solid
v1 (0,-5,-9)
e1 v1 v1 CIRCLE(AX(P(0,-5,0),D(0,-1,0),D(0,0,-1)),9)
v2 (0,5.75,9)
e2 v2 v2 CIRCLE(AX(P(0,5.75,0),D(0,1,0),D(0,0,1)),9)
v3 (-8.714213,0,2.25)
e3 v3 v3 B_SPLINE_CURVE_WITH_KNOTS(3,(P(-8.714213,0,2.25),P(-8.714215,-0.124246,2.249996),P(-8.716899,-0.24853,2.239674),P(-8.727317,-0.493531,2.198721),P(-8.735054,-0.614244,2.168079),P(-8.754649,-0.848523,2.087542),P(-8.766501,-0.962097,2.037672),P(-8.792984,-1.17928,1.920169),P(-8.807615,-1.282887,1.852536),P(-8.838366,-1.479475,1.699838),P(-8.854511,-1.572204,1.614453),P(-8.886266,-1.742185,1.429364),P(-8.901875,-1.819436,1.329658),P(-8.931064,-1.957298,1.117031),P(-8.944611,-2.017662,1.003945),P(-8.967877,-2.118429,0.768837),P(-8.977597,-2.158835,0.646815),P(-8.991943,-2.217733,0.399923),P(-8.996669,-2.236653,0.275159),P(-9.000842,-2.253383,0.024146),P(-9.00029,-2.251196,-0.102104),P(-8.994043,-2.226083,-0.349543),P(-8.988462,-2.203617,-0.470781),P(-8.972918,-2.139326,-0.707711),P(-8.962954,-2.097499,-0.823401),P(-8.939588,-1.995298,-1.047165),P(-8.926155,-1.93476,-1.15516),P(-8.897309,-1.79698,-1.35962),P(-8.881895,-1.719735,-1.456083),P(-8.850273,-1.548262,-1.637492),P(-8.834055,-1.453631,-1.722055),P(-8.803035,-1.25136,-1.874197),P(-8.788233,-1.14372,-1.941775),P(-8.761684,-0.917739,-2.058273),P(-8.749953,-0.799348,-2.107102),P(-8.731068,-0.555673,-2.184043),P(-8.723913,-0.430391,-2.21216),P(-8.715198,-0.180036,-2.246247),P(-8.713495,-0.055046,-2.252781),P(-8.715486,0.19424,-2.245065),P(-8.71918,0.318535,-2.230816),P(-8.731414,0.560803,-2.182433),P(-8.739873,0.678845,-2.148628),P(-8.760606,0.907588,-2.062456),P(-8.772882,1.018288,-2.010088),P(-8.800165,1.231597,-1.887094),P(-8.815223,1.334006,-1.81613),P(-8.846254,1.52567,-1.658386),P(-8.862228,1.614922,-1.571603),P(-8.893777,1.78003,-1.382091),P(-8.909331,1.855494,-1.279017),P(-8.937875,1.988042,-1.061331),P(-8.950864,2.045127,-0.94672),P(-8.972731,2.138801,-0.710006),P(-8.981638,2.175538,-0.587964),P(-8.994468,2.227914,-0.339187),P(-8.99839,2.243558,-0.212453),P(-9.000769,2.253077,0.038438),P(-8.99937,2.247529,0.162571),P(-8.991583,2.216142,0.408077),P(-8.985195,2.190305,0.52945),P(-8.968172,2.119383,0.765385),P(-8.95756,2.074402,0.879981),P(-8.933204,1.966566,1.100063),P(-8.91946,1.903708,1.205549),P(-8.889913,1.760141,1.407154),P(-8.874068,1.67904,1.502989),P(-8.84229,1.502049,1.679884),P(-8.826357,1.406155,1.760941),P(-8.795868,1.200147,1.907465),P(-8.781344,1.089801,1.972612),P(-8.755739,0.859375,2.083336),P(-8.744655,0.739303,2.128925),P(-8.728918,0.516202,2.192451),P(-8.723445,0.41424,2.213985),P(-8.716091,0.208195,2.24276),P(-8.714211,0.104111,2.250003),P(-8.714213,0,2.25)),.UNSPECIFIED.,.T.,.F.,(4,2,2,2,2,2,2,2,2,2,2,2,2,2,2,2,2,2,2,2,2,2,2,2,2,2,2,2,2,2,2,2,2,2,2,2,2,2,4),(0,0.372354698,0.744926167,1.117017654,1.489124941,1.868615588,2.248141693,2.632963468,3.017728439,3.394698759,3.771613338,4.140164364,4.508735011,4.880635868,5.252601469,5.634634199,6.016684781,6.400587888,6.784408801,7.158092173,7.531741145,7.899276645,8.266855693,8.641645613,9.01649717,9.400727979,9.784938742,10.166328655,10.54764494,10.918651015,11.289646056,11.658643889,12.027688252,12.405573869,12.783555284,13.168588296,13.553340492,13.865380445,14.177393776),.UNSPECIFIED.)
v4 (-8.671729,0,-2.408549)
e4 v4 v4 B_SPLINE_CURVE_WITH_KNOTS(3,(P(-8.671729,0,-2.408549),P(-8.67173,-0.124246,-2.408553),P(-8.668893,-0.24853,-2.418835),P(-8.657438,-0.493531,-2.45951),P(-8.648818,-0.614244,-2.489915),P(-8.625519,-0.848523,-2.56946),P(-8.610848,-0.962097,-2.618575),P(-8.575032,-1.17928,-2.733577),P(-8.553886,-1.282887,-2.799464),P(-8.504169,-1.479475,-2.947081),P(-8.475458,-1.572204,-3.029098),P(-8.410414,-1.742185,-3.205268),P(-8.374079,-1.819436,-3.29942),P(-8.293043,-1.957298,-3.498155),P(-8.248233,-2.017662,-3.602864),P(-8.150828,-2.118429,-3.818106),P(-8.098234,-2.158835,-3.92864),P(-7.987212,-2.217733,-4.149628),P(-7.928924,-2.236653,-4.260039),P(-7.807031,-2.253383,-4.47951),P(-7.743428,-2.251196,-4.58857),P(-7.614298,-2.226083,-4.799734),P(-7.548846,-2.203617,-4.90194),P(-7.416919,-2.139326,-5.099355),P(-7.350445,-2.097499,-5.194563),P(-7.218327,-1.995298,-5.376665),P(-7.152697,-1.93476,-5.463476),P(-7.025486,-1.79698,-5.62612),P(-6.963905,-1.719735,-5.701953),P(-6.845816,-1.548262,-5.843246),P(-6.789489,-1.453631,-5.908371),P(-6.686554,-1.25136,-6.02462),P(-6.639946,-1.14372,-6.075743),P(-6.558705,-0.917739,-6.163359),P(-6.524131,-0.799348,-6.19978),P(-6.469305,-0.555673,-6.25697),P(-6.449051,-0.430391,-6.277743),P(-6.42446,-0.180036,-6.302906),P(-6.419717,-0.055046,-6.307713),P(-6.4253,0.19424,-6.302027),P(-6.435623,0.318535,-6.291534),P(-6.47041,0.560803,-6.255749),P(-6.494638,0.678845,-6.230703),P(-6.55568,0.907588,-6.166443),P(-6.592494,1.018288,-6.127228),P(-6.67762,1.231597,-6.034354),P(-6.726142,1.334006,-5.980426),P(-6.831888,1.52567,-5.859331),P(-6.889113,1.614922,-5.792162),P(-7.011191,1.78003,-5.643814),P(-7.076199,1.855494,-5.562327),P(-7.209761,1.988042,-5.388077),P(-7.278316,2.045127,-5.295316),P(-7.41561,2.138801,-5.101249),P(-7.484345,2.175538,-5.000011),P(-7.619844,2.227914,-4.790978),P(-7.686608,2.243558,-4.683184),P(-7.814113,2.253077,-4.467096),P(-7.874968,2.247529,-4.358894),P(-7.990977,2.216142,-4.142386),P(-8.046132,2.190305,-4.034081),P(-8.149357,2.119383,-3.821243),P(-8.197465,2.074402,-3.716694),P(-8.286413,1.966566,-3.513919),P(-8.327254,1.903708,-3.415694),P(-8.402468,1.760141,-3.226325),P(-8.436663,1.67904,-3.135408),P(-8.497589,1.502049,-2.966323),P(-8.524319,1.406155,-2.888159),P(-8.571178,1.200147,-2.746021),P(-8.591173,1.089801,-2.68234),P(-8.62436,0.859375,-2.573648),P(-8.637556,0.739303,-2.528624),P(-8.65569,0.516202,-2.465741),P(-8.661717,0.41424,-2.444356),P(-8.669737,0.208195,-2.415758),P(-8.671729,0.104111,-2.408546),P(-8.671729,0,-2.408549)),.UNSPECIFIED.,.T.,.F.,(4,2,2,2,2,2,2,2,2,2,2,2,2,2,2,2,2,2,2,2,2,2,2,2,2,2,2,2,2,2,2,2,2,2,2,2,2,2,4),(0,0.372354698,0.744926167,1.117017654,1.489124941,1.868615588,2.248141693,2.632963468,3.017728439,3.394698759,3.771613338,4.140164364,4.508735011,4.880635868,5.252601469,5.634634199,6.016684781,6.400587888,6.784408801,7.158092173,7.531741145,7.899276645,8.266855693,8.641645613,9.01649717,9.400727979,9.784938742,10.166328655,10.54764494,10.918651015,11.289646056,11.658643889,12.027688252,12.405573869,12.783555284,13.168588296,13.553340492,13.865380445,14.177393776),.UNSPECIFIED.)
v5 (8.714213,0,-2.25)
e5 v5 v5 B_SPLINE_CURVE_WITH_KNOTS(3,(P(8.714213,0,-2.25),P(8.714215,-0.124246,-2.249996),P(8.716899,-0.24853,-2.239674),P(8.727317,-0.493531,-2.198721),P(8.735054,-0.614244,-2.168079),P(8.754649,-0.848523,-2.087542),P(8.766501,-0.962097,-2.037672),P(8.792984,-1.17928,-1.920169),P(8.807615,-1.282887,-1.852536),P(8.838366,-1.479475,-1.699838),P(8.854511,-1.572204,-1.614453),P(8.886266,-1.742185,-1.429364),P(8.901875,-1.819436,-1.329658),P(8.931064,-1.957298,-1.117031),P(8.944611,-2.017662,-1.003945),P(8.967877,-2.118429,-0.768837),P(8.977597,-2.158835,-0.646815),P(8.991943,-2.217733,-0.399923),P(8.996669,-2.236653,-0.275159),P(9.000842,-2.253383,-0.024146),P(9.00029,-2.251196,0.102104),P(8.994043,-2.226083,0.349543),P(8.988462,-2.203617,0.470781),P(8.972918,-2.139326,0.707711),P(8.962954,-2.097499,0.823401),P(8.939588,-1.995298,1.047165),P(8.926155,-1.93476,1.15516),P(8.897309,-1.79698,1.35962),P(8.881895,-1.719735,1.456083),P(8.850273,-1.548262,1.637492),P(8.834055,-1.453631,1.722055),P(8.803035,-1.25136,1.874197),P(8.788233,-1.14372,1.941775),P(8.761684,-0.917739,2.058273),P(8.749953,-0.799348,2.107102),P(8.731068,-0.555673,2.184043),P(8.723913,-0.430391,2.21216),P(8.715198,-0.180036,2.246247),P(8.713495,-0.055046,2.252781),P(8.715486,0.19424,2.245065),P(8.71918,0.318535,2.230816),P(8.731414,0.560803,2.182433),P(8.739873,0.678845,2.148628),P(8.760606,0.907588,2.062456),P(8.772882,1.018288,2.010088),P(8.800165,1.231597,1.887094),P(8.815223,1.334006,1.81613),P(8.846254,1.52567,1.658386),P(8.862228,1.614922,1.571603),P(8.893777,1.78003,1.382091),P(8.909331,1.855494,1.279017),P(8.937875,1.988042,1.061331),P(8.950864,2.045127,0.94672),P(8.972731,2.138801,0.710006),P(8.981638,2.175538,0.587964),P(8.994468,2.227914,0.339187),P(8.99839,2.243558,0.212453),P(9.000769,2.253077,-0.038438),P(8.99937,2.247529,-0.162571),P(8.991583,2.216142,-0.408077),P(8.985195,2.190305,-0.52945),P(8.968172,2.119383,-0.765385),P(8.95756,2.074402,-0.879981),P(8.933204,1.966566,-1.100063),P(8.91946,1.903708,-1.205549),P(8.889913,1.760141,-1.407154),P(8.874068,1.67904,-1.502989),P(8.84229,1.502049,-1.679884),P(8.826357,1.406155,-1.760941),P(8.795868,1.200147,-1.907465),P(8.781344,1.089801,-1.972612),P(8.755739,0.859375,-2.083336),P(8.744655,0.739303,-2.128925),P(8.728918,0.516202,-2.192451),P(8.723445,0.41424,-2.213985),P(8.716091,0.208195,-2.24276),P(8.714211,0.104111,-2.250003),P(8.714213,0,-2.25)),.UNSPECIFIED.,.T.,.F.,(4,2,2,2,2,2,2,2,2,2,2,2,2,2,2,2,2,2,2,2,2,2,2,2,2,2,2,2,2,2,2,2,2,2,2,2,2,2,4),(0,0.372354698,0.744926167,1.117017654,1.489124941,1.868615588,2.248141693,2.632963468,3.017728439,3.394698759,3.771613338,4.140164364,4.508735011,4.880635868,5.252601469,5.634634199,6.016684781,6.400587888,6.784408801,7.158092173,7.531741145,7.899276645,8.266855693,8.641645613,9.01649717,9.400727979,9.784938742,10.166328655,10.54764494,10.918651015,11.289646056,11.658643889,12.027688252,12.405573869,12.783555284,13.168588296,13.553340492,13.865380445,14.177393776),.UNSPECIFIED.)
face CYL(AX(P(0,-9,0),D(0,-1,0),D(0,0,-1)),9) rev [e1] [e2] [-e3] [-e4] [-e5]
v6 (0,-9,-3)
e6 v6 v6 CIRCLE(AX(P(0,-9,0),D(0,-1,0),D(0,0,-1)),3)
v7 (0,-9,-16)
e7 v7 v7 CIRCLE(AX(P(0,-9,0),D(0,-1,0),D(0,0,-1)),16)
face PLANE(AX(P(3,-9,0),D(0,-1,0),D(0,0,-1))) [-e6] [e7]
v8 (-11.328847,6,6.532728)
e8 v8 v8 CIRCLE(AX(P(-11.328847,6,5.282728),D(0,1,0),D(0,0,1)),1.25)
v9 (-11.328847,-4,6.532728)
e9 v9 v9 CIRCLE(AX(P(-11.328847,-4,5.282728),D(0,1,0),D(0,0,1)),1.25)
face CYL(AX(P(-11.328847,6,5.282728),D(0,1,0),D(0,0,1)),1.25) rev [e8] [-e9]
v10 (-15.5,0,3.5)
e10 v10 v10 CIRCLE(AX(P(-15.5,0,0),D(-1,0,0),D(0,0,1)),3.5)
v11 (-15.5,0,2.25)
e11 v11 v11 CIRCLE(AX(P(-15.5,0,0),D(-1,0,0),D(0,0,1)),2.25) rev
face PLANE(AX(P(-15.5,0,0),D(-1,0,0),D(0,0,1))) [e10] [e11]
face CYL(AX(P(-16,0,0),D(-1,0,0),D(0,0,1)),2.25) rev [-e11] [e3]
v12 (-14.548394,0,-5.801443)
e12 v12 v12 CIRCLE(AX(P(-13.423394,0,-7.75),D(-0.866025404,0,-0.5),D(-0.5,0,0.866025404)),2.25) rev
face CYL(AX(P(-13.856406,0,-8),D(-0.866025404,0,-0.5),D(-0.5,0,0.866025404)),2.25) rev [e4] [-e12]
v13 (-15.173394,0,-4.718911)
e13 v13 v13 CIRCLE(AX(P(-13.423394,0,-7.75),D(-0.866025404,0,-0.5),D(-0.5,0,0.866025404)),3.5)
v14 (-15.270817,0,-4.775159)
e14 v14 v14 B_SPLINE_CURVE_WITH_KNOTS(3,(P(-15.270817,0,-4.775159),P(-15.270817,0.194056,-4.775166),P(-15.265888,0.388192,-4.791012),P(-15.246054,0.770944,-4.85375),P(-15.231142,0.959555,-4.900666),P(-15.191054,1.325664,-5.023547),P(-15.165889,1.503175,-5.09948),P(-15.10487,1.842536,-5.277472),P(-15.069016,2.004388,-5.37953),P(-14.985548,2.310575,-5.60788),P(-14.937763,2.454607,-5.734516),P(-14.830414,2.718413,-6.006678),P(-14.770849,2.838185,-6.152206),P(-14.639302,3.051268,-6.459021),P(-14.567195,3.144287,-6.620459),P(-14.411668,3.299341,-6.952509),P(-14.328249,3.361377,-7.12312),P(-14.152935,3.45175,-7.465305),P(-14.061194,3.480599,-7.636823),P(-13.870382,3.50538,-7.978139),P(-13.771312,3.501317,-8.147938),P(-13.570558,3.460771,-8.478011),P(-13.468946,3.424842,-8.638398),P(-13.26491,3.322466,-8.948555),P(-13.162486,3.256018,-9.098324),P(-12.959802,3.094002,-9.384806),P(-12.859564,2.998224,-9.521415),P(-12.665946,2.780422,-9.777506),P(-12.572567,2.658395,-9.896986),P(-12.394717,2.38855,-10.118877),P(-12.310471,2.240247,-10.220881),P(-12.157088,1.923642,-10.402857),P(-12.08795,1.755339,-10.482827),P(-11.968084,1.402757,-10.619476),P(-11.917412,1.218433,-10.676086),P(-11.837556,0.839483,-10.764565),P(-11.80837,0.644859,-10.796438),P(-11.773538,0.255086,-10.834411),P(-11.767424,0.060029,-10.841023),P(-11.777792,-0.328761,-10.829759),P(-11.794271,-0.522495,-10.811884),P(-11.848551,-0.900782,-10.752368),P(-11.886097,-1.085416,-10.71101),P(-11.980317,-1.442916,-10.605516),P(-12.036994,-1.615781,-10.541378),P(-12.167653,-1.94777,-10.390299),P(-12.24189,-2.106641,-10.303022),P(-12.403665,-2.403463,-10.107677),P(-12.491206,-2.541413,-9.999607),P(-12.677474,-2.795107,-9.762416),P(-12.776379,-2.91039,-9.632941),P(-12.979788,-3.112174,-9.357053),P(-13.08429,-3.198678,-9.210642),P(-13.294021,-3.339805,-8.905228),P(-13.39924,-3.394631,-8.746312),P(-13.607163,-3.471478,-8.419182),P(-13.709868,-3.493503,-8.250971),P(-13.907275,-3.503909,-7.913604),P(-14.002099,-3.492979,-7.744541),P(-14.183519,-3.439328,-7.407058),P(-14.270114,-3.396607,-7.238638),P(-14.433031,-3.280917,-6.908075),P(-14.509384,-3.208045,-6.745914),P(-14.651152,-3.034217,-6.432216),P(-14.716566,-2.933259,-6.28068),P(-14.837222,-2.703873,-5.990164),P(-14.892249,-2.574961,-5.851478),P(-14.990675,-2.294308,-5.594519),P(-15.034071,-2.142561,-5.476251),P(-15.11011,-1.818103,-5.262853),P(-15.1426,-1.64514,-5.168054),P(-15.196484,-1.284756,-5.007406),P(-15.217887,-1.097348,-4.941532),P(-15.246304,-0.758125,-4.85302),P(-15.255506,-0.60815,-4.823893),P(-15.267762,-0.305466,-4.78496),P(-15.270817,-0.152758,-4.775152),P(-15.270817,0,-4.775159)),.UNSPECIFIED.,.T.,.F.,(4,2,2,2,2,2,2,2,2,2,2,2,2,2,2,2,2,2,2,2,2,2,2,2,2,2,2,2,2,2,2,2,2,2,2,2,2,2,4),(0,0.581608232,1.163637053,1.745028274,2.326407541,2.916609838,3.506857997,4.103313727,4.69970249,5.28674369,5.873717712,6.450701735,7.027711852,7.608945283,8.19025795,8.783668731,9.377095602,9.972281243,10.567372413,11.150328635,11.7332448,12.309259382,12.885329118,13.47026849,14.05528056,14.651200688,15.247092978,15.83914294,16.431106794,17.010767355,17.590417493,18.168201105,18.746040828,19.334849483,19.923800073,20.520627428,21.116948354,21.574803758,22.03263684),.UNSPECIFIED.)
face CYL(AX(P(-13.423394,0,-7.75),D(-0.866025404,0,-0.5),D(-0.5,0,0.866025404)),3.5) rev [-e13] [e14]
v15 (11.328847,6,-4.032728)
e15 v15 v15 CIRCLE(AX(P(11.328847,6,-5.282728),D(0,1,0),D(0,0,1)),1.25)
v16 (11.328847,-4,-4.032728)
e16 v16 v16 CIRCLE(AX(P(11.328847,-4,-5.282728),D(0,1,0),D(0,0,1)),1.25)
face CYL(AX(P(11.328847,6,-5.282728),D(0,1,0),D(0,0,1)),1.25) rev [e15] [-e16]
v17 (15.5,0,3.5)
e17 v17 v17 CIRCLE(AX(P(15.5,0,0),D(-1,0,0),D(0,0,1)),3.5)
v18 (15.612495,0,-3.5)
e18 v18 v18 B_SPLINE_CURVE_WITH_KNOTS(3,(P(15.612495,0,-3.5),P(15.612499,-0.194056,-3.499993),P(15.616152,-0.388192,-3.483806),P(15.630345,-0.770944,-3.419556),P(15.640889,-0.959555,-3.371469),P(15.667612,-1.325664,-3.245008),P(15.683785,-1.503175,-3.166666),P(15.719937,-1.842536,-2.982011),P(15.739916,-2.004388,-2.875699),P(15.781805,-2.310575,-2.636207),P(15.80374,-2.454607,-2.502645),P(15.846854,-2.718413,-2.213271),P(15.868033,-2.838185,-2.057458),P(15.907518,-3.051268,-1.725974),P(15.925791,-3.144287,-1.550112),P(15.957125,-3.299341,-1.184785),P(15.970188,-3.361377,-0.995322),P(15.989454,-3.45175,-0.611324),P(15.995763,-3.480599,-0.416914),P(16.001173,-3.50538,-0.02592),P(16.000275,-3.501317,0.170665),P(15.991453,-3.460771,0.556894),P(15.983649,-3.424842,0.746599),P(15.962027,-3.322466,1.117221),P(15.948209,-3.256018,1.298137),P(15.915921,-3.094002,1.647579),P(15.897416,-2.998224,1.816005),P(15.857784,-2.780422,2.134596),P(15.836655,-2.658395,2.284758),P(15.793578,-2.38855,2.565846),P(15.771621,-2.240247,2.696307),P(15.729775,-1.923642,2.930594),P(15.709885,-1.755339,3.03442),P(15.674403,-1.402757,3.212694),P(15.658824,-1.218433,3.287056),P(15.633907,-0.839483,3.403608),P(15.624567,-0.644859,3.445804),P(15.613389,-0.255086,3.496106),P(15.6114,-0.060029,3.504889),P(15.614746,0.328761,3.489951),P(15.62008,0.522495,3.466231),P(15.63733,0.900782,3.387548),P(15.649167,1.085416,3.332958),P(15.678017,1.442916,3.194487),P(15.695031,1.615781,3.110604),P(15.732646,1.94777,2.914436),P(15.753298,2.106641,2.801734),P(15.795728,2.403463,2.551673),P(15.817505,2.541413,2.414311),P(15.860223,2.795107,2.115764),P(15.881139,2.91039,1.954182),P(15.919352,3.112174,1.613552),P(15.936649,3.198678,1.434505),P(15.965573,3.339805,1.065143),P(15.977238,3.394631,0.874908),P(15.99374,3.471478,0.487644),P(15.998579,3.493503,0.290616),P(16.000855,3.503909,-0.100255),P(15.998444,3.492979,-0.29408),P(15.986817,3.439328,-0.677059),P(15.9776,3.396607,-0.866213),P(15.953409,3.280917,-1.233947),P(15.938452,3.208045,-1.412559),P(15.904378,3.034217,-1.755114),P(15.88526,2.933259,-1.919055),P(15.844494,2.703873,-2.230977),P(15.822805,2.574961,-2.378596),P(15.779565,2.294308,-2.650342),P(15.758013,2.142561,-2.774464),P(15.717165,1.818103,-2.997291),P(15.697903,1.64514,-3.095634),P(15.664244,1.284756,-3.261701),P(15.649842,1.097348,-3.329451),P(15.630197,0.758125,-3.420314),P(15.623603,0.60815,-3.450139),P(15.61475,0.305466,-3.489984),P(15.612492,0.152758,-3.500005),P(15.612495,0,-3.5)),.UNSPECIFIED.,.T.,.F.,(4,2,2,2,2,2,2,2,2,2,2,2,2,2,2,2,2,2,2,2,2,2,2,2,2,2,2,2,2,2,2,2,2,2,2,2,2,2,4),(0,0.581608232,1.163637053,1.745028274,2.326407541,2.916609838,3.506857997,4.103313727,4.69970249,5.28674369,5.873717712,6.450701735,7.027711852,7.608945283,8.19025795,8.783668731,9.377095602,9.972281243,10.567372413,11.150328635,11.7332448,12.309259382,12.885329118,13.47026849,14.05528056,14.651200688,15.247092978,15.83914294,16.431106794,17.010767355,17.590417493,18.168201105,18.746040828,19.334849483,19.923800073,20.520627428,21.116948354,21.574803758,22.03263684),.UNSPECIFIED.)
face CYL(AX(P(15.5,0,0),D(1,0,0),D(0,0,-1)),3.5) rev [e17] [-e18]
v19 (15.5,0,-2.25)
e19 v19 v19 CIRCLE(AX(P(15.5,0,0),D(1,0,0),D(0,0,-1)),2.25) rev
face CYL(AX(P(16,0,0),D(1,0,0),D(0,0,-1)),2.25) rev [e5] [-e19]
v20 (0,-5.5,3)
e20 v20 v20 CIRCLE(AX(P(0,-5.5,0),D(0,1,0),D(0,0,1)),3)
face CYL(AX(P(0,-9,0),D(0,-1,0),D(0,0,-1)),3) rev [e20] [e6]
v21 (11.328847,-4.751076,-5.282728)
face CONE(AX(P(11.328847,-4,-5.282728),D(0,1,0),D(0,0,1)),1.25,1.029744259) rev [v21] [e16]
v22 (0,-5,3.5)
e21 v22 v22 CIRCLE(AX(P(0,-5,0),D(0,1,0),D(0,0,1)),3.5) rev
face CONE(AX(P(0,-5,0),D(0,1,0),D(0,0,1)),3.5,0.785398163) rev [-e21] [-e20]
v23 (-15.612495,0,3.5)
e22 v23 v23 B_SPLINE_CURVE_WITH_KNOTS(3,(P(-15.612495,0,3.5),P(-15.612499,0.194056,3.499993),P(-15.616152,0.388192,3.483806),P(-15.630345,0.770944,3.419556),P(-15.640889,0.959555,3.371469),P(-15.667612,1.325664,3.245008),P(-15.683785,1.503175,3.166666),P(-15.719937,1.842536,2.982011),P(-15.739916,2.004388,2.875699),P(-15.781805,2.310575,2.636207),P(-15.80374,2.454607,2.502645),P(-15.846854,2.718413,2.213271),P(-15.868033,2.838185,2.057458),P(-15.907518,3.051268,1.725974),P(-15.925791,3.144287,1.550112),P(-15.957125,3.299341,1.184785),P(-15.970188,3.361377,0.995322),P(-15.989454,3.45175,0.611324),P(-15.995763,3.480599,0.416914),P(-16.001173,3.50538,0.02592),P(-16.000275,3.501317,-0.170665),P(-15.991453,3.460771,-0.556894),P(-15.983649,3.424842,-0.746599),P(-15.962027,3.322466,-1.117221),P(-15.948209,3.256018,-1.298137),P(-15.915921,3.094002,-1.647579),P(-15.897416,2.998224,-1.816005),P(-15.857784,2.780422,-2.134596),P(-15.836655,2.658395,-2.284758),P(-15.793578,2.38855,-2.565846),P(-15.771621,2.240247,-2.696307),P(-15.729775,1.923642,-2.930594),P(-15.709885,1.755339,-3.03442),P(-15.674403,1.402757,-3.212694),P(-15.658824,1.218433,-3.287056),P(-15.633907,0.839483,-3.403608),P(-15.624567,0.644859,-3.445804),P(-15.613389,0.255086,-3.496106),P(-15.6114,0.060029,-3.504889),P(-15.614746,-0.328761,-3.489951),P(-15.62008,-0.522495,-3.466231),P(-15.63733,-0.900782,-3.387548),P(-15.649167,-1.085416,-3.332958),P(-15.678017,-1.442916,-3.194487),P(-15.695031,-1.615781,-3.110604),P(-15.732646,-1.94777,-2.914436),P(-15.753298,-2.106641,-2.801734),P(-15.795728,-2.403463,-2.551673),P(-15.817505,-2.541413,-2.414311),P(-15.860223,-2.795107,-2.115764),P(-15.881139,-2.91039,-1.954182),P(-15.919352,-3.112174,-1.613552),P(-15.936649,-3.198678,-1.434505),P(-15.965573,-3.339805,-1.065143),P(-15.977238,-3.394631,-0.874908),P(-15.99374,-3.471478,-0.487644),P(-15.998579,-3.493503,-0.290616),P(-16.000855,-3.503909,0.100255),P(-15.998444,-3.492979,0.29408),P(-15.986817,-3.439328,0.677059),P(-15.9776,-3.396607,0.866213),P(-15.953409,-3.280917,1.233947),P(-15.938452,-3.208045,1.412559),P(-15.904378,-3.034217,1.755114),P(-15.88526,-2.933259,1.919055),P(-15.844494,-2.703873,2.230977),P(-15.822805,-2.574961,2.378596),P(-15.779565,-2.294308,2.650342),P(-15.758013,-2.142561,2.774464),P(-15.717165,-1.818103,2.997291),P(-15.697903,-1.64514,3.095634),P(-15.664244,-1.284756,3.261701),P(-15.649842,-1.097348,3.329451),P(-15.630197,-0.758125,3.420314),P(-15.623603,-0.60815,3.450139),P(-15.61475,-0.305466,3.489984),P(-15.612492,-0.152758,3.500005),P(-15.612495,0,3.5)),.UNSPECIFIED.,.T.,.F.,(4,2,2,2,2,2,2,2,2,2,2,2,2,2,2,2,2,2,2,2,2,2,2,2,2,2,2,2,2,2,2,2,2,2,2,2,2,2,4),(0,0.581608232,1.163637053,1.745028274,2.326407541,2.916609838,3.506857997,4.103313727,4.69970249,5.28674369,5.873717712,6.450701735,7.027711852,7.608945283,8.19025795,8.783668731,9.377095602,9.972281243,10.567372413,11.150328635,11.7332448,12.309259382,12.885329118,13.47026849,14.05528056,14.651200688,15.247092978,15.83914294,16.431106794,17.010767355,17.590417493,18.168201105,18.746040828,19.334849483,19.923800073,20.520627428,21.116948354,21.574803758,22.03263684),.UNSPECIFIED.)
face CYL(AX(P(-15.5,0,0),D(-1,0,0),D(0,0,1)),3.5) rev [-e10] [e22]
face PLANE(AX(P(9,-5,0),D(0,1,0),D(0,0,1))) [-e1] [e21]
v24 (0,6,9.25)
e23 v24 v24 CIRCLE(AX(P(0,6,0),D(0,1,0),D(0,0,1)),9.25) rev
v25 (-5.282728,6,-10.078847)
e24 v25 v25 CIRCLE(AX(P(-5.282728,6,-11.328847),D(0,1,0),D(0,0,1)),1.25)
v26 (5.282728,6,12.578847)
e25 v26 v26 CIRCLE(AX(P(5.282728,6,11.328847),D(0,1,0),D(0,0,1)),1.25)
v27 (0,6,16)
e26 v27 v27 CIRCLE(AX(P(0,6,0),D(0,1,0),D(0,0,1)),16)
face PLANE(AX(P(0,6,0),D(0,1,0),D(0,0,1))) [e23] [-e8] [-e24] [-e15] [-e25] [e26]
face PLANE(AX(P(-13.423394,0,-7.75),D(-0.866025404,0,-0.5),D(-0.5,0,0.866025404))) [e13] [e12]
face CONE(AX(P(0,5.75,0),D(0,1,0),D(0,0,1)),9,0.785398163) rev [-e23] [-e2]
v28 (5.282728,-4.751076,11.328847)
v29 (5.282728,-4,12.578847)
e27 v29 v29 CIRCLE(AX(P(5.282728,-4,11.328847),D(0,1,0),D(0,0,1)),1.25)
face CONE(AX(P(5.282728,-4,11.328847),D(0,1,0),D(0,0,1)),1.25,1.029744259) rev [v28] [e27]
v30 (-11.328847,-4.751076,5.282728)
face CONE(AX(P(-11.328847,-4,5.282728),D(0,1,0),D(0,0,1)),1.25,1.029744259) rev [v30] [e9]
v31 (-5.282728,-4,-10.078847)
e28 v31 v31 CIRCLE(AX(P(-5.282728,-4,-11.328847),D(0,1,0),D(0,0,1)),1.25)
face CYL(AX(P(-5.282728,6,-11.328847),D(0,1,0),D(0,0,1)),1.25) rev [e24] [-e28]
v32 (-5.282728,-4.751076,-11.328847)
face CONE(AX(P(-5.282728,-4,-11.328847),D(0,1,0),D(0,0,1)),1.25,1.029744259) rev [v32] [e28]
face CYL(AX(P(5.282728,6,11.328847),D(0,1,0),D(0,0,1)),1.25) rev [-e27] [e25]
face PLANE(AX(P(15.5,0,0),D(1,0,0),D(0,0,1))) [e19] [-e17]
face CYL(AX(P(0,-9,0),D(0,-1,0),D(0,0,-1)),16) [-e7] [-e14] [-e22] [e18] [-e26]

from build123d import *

# Parameters (mm, degrees)
ESBO_O4_W                        = 2.25
ESBO_O4_H                        = 16
F_4_5_4_5_DIAMETER_HOLE2_D       = 4.5
F_4_5_4_5_DIAMETER_HOLE2_DEPTH   = 18
F_4_5_4_5_DIAMETER_HOLE2_TIP     = 1.351936393
ESBO_O12_R                       = 16
ESBO_O12_R_2                     = 9
RESSALTO_EXTRUS_O1_DEPTH         = 1
CHANFRO1_SIZE                    = 0.5
CHANFRO2_SIZE                    = 0.25
FURO_DE_DI_METRO_4_5_4_5_2_D     = 4.5
FURO_DE_DI_METRO_4_5_4_5_2_DEPTH = 8
FURO_DE_DI_METRO_4_5_4_5_2_TIP   = 1.351936393
ESBO_O18_R                       = 3.5
CORTE_EXTRUS_O4_DEPTH            = 0.5
ESBO_O20_R                       = 3.5
CORTE_EXTRUS_O5_DEPTH            = 0.5


# Read off the part's stored shape, not the designer's step: PadrãoCircular5
with BuildPart() as part:
    # Esboço1 → Revolução1 (revolve)
    with BuildSketch(Plane.XY, mode=Mode.PRIVATE) as revolu_o1_sk:
        Polygon((3, -9), (16, -9), (16, 5), (9, 5), (9, -5), (3, -5), align=None)
    revolve(revolu_o1_sk.sketch.rotate(Axis((0, -9, 0), (0, 1, 0)), 90), axis=Axis((0, -9, 0), (0, 1, 0)))

    # Esboço4 → Furo de diâmetro Ø4.5 (4.5)1 (revolve, cut)
    with BuildSketch(Plane(origin=(16, 0, 0), x_dir=(0, 0, -1), z_dir=(0, 1, 0))):
        with Locations((1.125, 8)):
            Rectangle(ESBO_O4_W, ESBO_O4_H)
    revolve(axis=Axis((22.35, 0, 0), (-1, 0, 0)), mode=Mode.SUBTRACT)

    # Ø4.5 (4.5) Diameter Hole2
    with Locations(Plane(origin=(-13.856406461, 0, -8), x_dir=(0, -1, 0), z_dir=(-0.8660254037844364, 0, -0.5000000000000041))):
        with Locations((0, 0)):
            Hole(F_4_5_4_5_DIAMETER_HOLE2_D / 2, depth=F_4_5_4_5_DIAMETER_HOLE2_DEPTH)
            with Locations((0, 0, -(F_4_5_4_5_DIAMETER_HOLE2_DEPTH + F_4_5_4_5_DIAMETER_HOLE2_TIP / 2))):  # 118° drill point
                Cone(0, F_4_5_4_5_DIAMETER_HOLE2_D / 2, F_4_5_4_5_DIAMETER_HOLE2_TIP, mode=Mode.SUBTRACT)

    # Esboço12 → Ressalto-extrusão1 (add)
    with BuildSketch(Plane(origin=(0, 5, 0), x_dir=(1, 0, 0), z_dir=(0, 1, 0))):
        with Locations(Location((0, 0, 0), (0, 0, 90))):
            Circle(ESBO_O12_R)
        with Locations(Location((0, 0, 0), (0, 0, 90))):
            Circle(ESBO_O12_R_2, mode=Mode.SUBTRACT)
    extrude(amount=RESSALTO_EXTRUS_O1_DEPTH)

    # Esboço13 → Furo roscado de M3x0.51 (revolve, cut)
    with BuildSketch(Plane(origin=(11.328847338, 6, -5.282728272), x_dir=(0, 0, 1), z_dir=(1, 0, 0))):
        Polygon((0, 0), (0, 10.751075774), (1.25, 10), (1.25, 0), align=None)
    revolve(axis=Axis((11.328847338, 12.35, -5.282728272), (0, -1, 0)), mode=Mode.SUBTRACT)

    # PadrãoCircular5 outline → PadrãoCircular5 (revolve, cut)
    with BuildSketch(Plane(origin=(5.282728272, 0, 11.328847338), x_dir=(1, 0, 0), z_dir=(0, 0, 1))):
        Polygon((0, 6), (0, -4.751075774), (1.25, -4), (1.25, 6), align=None)
    revolve(axis=Axis((5.282728272, 0, 11.328847338), (0, 1, 0)), mode=Mode.SUBTRACT)

    # Padr_oCircular5 2 outline → Padr_oCircular5 2 (revolve, cut)
    with BuildSketch(Plane(origin=(-11.328847338, 0, 5.282728272), x_dir=(1, 0, 0), z_dir=(0, 0, 1))):
        Polygon((0, 6), (0, -4.751075774), (1.25, -4), (1.25, 6), align=None)
    revolve(axis=Axis((-11.328847338, 0, 5.282728272), (0, 1, 0)), mode=Mode.SUBTRACT)

    # Padr_oCircular5 3 outline → Padr_oCircular5 3 (revolve, cut)
    with BuildSketch(Plane(origin=(-5.282728272, 0, -11.328847338), x_dir=(1, 0, 0), z_dir=(0, 0, 1))):
        Polygon((0, 6), (0, -4.751075774), (1.25, -4), (1.25, 6), align=None)
    revolve(axis=Axis((-5.282728272, 0, -11.328847338), (0, 1, 0)), mode=Mode.SUBTRACT)

    # Chanfro1
    chanfro1_edges = [part.edges().sort_by_distance(p)[0] for p in [
        (0, -5, 3),
    ]]
    chamfer(chanfro1_edges, length=CHANFRO1_SIZE)

    # Chanfro2
    chanfro2_edges = [part.edges().sort_by_distance(p)[0] for p in [
        (0, 6, 9),
    ]]
    chamfer(chanfro2_edges, length=CHANFRO2_SIZE)

    # Furo de diâmetro Ø4.5 (4.5)2
    with Locations(Plane(origin=(-16, 0, 0), x_dir=(0, 0, -1), z_dir=(-1, 0, 0))):
        with Locations((0, 0)):
            Hole(FURO_DE_DI_METRO_4_5_4_5_2_D / 2, depth=FURO_DE_DI_METRO_4_5_4_5_2_DEPTH)
            with Locations((0, 0, -(FURO_DE_DI_METRO_4_5_4_5_2_DEPTH + FURO_DE_DI_METRO_4_5_4_5_2_TIP / 2))):  # 118° drill point
                Cone(0, FURO_DE_DI_METRO_4_5_4_5_2_D / 2, FURO_DE_DI_METRO_4_5_4_5_2_TIP, mode=Mode.SUBTRACT)

    # Esboço18 → Corte-extrusão4 (cut)
    with BuildSketch(Plane(origin=(-16, 0, 0), x_dir=(0, -1, 0), z_dir=(-1, 0, 0))):
        with Locations(Location((0, 0, 0), (0, 0, 90))):
            Circle(ESBO_O18_R)
    corte_extrus_o4 = extrude(amount=-CORTE_EXTRUS_O4_DEPTH, mode=Mode.SUBTRACT)

    # Esboço20 → Corte-extrusão5 (cut)
    with BuildSketch(Plane(origin=(-13.856406461, 0, -8), x_dir=(0, -1, 0), z_dir=(-0.8660254037844364, 0, -0.5000000000000041))):
        with Locations(Location((0, 0, 0), (0, 0, 90))):
            Circle(ESBO_O20_R)
    extrude(amount=-CORTE_EXTRUS_O5_DEPTH, mode=Mode.SUBTRACT)

    # Espelhar1: Corte-extrusão4 across plane
    add(corte_extrus_o4.mirror(Plane(origin=(0, 0, 0), x_dir=(0, 0, 1), z_dir=(1, 0, 0))), mode=Mode.SUBTRACT)


solid = part.part
